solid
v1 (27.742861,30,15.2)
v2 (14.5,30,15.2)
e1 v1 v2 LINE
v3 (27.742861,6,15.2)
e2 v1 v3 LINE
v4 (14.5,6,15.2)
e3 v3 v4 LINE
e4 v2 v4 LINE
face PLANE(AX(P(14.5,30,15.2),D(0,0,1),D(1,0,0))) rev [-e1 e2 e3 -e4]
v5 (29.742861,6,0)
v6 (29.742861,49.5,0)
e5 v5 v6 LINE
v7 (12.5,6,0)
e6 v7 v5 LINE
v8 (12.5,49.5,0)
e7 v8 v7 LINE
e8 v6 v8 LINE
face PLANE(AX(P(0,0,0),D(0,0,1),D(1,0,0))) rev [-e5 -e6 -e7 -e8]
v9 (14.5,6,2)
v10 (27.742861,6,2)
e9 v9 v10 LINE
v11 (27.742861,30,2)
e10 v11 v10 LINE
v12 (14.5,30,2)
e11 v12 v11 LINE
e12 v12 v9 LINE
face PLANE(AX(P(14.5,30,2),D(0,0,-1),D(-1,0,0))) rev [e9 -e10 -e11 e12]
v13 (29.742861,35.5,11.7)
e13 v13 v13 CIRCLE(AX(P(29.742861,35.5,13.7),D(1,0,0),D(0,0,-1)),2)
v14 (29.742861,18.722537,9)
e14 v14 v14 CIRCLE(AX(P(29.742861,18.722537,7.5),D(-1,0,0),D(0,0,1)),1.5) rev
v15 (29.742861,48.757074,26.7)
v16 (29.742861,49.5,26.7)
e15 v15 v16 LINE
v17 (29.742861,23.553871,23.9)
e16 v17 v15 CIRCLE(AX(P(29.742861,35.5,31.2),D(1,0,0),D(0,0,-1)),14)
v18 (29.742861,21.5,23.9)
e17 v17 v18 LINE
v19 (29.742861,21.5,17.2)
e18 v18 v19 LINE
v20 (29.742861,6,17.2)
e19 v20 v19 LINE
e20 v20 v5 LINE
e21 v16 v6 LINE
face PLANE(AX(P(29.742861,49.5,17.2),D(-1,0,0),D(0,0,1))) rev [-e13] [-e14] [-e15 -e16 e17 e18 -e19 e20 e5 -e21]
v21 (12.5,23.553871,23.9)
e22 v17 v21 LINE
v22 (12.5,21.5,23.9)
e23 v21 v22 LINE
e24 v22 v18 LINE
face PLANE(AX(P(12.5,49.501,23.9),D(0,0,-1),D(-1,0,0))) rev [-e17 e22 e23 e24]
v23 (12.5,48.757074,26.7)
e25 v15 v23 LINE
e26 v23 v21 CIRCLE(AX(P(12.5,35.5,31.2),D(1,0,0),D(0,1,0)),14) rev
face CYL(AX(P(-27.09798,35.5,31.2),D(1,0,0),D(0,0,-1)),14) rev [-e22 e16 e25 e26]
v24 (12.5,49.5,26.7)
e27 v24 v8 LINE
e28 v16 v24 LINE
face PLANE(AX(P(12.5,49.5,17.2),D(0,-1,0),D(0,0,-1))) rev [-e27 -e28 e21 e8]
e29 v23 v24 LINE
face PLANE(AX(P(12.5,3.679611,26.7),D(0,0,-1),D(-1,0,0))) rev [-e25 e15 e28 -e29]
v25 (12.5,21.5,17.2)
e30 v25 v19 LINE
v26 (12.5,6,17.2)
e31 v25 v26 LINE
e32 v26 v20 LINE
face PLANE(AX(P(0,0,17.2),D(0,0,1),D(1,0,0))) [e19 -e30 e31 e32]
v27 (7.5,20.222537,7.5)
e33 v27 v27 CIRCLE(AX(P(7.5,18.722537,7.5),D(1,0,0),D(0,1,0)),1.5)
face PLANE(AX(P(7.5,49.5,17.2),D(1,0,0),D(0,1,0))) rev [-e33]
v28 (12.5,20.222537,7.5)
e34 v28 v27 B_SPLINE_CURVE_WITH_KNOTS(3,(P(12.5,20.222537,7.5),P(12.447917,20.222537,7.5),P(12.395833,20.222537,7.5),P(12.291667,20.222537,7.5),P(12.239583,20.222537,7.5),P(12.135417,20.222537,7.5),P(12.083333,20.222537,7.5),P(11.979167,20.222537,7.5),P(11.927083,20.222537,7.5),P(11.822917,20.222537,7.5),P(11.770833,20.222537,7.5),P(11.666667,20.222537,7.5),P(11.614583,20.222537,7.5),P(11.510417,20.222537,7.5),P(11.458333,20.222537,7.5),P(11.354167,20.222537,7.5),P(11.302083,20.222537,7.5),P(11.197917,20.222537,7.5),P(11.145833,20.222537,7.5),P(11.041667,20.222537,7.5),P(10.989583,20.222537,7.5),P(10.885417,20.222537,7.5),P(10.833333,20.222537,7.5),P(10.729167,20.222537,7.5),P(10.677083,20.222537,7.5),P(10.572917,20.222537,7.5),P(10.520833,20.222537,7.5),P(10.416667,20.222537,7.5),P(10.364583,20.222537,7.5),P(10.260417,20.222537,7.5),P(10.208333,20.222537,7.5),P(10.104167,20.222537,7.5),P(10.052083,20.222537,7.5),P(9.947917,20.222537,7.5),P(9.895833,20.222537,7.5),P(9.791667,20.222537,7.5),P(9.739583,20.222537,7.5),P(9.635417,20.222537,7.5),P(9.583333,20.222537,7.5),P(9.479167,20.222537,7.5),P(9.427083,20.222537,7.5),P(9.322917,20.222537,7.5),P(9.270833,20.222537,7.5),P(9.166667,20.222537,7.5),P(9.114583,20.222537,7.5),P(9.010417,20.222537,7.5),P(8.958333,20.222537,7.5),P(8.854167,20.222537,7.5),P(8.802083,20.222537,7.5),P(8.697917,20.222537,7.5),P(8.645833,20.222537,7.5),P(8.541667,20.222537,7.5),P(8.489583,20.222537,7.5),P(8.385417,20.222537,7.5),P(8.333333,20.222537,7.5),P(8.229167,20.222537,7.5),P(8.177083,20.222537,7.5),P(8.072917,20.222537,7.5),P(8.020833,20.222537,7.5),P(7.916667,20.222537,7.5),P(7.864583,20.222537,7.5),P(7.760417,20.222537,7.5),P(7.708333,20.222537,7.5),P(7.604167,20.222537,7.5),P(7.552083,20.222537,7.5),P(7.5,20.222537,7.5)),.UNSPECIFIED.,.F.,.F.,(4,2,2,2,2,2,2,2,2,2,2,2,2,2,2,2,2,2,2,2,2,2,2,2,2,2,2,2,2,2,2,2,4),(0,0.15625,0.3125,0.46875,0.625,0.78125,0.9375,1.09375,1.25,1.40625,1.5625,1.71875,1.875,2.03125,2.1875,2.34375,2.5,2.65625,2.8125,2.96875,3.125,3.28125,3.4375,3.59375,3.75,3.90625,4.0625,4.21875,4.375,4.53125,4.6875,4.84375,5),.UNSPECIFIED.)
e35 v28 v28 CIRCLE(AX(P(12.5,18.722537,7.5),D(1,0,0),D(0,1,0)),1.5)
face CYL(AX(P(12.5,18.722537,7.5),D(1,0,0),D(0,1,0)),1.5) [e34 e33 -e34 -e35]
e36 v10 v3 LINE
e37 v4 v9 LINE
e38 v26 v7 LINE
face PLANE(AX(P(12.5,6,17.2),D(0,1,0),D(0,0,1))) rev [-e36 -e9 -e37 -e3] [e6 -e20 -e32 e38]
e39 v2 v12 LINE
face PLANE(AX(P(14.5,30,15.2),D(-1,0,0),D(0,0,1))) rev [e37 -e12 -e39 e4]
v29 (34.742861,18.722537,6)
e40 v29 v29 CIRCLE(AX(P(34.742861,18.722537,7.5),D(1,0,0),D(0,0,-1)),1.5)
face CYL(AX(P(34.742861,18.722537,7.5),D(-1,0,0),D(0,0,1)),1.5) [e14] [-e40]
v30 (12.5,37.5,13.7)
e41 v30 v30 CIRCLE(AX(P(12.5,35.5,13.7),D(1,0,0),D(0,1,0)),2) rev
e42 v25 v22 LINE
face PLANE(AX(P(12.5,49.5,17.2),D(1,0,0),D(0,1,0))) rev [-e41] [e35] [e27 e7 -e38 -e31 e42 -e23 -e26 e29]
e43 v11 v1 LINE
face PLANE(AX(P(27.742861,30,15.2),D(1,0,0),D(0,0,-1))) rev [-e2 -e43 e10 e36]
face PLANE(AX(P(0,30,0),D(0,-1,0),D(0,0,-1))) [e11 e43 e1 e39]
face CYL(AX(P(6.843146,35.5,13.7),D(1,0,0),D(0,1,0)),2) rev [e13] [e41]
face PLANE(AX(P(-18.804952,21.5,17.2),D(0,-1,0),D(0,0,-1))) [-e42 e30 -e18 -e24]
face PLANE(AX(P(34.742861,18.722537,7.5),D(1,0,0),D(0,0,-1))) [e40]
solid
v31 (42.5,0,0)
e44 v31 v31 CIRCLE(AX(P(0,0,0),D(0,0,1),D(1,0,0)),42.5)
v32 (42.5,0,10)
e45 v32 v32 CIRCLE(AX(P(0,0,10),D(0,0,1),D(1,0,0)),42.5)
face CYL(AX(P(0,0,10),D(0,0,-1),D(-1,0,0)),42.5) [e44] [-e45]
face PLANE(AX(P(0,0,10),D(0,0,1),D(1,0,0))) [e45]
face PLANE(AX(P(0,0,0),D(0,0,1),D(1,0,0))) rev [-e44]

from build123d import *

# Parameters (mm, degrees)
SKETCH4_R               = 42.5
BASE_DEPTH              = 10
SKETCH5_W               = 17.242861366
SKETCH5_H               = 43.5
BOSS_EXTRUDE1_DEPTH     = 17.2
SKETCH6_W               = 13.242861366
SKETCH6_H               = 13.2
CUT_EXTRUDE1_DEPTH      = 24
SKETCH9_R               = 1.5
BOSS_EXTRUDE2_DEPTH     = 5
WRAP1_START             = -22.242861366
WRAP1_OUTLINE_R         = 1.5
WRAP1_DEPTH             = 5
SKETCH14_W              = 14
SKETCH14_H              = 28
BOSS_EXTRUDE4_DEPTH     = 17.242861366
SKETCH16_R              = 14
CUT_EXTRUDE2_DEPTH      = 17.242861366
CUT_EXTRUDE4_REACH      = 108.036
SKETCH19_W              = 17.242861366
SKETCH19_H              = 4.5
CUT_EXTRUDE6_REACH      = 71.795
CUT_EXTRUDE6_END_RADIUS = 14
SKETCH22_W              = 17.242861366
SKETCH22_H              = 2.8
SKETCH23_R              = 2
CUT_EXTRUDE7_DEPTH      = 17.242861366


# Read off the part's stored shape, not the designer's step: Wrap1
with BuildPart() as part:
    # Sketch4 → base (new body)
    with BuildSketch(Plane.XY):
        Circle(SKETCH4_R)
    extrude(amount=BASE_DEPTH)


with BuildPart() as body_2:
    # Sketch5 → Boss-Extrude1 (new body)
    with BuildSketch(Plane.XY):
        with Locations((21.121430683, 27.75)):
            Rectangle(SKETCH5_W, SKETCH5_H)
    extrude(amount=BOSS_EXTRUDE1_DEPTH)

    # Sketch6 → Cut-Extrude1 (cut)
    with BuildSketch(Plane(origin=(0, 6, 0), x_dir=(-1, 0, 0), z_dir=(0, -1, 0))):
        with Locations((-21.121430683, -8.6)):
            Rectangle(SKETCH6_W, SKETCH6_H)
    extrude(amount=-CUT_EXTRUDE1_DEPTH, mode=Mode.SUBTRACT)

    # Sketch9 → Boss-Extrude2 (add)
    with BuildSketch(Plane(origin=(29.742861366, 0, 0), x_dir=(0, 0, -1), z_dir=(1, 0, 0))):
        with Locations(Location((-7.5, 18.722537456, 0), (0, 0, 180))):
            Circle(SKETCH9_R)
    extrude(amount=BOSS_EXTRUDE2_DEPTH)

    # Wrap1 outline → Wrap1 (add)
    with BuildSketch(Plane(origin=(29.742861366, 0, 0), x_dir=(0, 0, -1), z_dir=(1, 0, 0)).offset(WRAP1_START)):
        with Locations((-7.5, 18.722537456)):
            Circle(WRAP1_OUTLINE_R)
    extrude(amount=WRAP1_DEPTH)

    # Sketch14 → Boss-Extrude4 (add)
    with BuildSketch(Plane(origin=(29.742861366, 0, 0), x_dir=(0, 0, -1), z_dir=(1, 0, 0))):
        with Locations((-24.2, 35.5)):
            Rectangle(SKETCH14_W, SKETCH14_H)
    extrude(amount=-BOSS_EXTRUDE4_DEPTH)

    # Sketch16 → Cut-Extrude2 (cut)
    with BuildSketch(Plane(origin=(29.742861366, 0, 0), x_dir=(0, 0, -1), z_dir=(1, 0, 0))):
        with Locations((-31.2, 35.5)):
            Circle(SKETCH16_R)
    extrude(amount=-CUT_EXTRUDE2_DEPTH, mode=Mode.SUBTRACT)

    # Cut-Extrude4: up to this face of the body (flat: up to its plane)
    cut_extrude4_end = Plane(body_2.part.faces().sort_by_distance((21.121430683, 21.5, 24.2))[0])
    # Sketch19 → Cut-Extrude4 (cut, up to the picked face)
    with BuildSketch(Plane(origin=(0, 49.5, 0), x_dir=(1, 0, 0), z_dir=(0, 1, 0)), mode=Mode.PRIVATE) as cut_extrude4_sk1:
        with Locations((21.121430683, -28.95)):
            Rectangle(SKETCH19_W, SKETCH19_H)
    cut_extrude4_tool1 = split(extrude(cut_extrude4_sk1.sketch, amount=-CUT_EXTRUDE4_REACH, mode=Mode.PRIVATE), bisect_by=cut_extrude4_end, keep=Keep.BOTH, mode=Mode.PRIVATE)
    add(cut_extrude4_tool1.solids().sort_by(Axis((21.121431, 49.5, 28.95), (0, -1, 0)))[0], mode=Mode.SUBTRACT)

    # Cut-Extrude6: up to this cylinder (the profile starts outside it)
    cut_extrude6_end = Plane(origin=(21.121431, 35.5, 31.2), z_dir=(1, 0, 0)) * Cylinder(CUT_EXTRUDE6_END_RADIUS, 172.59, mode=Mode.PRIVATE)
    # Sketch22 → Cut-Extrude6 (cut, up to the surface)
    with BuildSketch(Plane(origin=(0, 6, 0), x_dir=(-1, 0, 0), z_dir=(0, -1, 0)), mode=Mode.PRIVATE) as cut_extrude6_sk1:
        with Locations((-21.121430683, -25.3)):
            Rectangle(SKETCH22_W, SKETCH22_H)
    cut_extrude6_tool1 = extrude(cut_extrude6_sk1.sketch, amount=-CUT_EXTRUDE6_REACH, mode=Mode.PRIVATE) - cut_extrude6_end
    add(cut_extrude6_tool1.solids().sort_by_distance((21.121431, 6, 25.3))[0], mode=Mode.SUBTRACT)

    # Sketch23 → Cut-Extrude7 (cut)
    with BuildSketch(Plane(origin=(29.742861366, 0, 0), x_dir=(0, 0, -1), z_dir=(1, 0, 0))):
        with Locations(Location((-13.7, 35.5, 0), (0, 0, 90))):
            Circle(SKETCH23_R)
    extrude(amount=-CUT_EXTRUDE7_DEPTH, mode=Mode.SUBTRACT)


solid = Compound([part.part, body_2.part])
